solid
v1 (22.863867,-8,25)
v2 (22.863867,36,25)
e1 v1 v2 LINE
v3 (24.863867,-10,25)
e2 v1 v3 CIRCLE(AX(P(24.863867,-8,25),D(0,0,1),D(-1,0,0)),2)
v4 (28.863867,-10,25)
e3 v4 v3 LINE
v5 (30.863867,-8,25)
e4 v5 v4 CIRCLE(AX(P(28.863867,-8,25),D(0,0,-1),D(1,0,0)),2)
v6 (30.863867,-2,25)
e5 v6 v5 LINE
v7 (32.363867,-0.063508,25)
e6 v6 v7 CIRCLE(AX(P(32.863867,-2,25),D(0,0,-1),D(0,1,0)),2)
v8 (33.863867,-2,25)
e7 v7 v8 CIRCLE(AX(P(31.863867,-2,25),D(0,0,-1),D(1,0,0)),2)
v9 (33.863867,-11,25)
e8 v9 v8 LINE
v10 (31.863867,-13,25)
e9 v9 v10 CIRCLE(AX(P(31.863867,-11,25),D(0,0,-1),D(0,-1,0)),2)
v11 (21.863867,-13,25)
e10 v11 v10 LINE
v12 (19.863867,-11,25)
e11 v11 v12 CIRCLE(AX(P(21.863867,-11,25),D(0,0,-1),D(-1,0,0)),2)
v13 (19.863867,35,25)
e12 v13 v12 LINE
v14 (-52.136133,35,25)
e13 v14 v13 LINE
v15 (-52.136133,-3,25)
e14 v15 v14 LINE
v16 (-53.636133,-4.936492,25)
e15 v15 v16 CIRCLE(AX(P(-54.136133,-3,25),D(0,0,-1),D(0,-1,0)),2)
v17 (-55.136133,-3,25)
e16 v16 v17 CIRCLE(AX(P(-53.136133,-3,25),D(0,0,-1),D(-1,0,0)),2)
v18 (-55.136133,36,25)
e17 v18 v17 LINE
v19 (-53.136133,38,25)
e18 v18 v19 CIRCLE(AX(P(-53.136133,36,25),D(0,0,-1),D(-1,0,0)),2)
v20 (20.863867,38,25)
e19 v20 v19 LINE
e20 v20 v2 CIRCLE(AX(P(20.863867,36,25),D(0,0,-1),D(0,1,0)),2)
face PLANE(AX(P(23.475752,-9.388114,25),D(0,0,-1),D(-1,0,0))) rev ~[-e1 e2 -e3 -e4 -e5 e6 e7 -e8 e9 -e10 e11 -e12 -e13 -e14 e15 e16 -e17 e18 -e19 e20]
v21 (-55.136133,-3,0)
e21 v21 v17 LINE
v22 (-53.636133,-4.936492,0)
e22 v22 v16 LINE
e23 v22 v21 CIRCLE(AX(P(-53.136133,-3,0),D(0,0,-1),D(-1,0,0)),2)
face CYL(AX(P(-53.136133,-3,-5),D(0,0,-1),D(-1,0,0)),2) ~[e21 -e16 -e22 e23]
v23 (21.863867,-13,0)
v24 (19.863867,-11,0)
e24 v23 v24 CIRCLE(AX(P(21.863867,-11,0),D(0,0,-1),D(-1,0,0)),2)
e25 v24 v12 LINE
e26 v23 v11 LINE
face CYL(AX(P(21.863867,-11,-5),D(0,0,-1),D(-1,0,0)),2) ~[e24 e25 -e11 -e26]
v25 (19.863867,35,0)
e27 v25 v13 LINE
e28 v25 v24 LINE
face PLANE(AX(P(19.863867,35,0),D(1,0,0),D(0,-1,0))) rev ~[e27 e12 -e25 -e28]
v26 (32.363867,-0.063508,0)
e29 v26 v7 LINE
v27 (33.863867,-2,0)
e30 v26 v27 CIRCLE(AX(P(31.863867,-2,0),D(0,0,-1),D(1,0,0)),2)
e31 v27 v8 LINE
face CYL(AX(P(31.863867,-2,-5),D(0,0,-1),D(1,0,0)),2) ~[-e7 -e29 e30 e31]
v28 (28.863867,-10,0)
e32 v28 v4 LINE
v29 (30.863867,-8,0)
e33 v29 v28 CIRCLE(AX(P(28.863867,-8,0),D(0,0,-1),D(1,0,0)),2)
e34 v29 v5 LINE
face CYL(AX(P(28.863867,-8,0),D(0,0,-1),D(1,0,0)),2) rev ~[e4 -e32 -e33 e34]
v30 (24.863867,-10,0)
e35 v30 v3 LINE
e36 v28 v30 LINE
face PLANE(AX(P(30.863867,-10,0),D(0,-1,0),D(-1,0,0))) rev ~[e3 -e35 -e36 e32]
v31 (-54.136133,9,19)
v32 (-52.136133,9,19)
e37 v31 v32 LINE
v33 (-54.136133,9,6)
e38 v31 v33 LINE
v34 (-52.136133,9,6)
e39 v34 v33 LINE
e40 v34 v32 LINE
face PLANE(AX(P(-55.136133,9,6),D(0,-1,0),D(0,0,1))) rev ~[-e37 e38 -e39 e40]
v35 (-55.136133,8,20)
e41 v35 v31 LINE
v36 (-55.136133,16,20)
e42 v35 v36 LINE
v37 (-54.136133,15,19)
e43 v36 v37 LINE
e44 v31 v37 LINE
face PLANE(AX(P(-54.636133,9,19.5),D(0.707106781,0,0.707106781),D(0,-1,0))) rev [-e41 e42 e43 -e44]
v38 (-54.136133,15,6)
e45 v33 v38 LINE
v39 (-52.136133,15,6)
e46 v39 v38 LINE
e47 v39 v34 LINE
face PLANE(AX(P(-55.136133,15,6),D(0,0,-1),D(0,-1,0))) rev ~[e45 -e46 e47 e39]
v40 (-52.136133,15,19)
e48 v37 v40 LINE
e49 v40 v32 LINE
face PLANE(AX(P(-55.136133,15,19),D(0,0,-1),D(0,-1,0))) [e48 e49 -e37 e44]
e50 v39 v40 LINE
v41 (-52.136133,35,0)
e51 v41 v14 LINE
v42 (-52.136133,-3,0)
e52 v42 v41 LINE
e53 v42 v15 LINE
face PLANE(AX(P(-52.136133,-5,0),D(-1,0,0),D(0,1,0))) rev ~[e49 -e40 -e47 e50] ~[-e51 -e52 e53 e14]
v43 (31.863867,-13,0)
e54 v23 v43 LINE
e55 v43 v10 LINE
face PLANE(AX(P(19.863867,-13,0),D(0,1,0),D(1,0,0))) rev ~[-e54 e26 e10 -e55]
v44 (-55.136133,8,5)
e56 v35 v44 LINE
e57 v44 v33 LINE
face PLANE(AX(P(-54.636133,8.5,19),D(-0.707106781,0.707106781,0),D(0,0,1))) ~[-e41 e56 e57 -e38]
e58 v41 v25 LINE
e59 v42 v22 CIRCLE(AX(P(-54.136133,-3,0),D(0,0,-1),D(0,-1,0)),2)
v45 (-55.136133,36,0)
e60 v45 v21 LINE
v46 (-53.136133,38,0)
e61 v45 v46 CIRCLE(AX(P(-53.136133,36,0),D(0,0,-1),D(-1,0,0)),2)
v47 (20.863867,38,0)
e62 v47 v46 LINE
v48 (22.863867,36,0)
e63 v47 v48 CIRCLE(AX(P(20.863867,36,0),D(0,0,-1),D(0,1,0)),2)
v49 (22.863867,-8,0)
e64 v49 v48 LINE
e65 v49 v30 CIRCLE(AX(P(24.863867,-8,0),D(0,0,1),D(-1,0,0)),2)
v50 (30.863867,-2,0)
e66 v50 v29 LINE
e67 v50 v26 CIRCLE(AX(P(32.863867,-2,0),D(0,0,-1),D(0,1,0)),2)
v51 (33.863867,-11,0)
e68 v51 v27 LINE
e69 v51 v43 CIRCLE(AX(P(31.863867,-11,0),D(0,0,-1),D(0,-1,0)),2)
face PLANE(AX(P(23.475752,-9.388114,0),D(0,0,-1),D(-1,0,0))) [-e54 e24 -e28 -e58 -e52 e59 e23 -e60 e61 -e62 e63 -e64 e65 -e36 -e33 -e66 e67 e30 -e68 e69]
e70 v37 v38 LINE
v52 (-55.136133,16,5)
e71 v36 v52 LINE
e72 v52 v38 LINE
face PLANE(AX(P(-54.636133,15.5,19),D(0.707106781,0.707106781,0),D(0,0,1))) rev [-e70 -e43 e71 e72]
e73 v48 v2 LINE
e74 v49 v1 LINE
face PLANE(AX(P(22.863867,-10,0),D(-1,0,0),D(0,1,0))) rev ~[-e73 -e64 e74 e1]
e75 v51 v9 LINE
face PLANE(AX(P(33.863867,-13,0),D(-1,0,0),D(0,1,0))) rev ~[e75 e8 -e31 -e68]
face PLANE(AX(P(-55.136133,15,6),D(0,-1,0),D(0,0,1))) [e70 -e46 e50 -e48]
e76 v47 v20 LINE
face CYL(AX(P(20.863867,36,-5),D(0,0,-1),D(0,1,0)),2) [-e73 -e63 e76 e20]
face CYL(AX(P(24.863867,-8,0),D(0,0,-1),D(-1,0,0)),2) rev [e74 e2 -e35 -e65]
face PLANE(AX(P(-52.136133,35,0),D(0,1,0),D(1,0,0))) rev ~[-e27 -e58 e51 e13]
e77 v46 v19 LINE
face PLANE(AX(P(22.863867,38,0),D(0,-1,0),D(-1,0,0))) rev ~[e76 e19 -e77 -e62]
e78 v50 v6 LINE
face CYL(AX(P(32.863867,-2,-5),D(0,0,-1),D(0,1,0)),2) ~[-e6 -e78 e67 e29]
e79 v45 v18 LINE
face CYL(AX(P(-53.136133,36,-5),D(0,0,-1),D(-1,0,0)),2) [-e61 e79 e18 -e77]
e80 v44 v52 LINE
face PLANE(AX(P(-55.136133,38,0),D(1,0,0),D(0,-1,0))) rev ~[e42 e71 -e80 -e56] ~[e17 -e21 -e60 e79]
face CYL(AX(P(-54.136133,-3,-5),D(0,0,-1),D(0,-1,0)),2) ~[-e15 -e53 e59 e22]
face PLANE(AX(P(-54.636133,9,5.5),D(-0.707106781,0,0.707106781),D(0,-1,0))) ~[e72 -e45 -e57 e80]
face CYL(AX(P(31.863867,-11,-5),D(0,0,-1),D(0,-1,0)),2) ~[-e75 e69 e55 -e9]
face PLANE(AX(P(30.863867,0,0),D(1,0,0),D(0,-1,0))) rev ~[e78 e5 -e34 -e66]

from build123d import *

# Parameters (mm, degrees)
F1_DEPTH    = 25
F2_W        = 6
F2_H        = 13
F3_DEPTH    = 12.5
F4_SIZE2    = 1
F4_SIZE     = 1
F5_T1_DEPTH = 25
F5_T3_DEPTH = 35


# Not quite as in the source:
# - a fillet or chamfer that OpenCascade refuses, or shapes differently, is made with other operations: its cross-section is extruded or revolved along the edge and cut away or added


with BuildPart() as f1:
    # F0 (on Top) → F1 (new body)
    with BuildSketch(Plane.XY):
        Polygon((-55.1361331344, -5), (-52.1361331344, -5), (-52.1361331344, 35), (19.8638668656, 35), (19.8638668656, -10), (19.8638668656, -13), (30.8638668656, -13), (33.8638668656, -13), (33.8638668656, -10), (33.8638668656, 0), (30.8638668656, 0), (30.8638668656, -10), (22.8638668656, -10), (22.8638668656, 38), (-55.1361331344, 38), align=None)
    extrude(amount=F1_DEPTH)

    # F2 (on face) → F3 (cut, symmetric)
    with BuildSketch(Plane(origin=(-55.1361331344, 0, 0), x_dir=(0, -1, 0), z_dir=(-1, 0, 0))):
        with Locations((-12, 12.5)):
            Rectangle(F2_W, F2_H)
    extrude(amount=F3_DEPTH, both=True, mode=Mode.SUBTRACT)

    # F4
    f4_edges = [f1.edges().sort_by_distance(p)[0] for p in [
        (-55.136133, 12, 19),
        (-55.136133, 15, 12.5),
        (-55.136133, 9, 12.5),
        (-55.136133, 12, 6),
    ]]
    chamfer(f4_edges, length=F4_SIZE, length2=F4_SIZE2)

    # F5: fillet of radius 2 on 10 edges, made by hand

    # F5_s2 → F5_t1 (join)
    with BuildSketch(Plane.XY):
        with BuildLine():
            ThreePointArc((22.8638668656, -8), (23.4496533033, -9.4142135624), (24.8638668656, -10))
            Line((24.8638668656, -10), (22.8638668656, -10))
            Line((22.8638668656, -10), (22.8638668656, -8))
        make_face()
        with BuildLine():
            ThreePointArc((30.8638668656, -8), (30.278080428, -9.4142135624), (28.8638668656, -10))
            Line((28.8638668656, -10), (30.8638668656, -10))
            Line((30.8638668656, -10), (30.8638668656, -8))
        make_face()
    extrude(amount=F5_T1_DEPTH)

    # F5_s4 → F5_t3 (cut)
    with BuildSketch(Plane.XY.offset(-5)):
        with BuildLine():
            ThreePointArc((-55.1361331344, 36), (-54.5503466967, 37.4142135624), (-53.1361331344, 38))
            Line((-53.1361331344, 38), (-55.1361331344, 38))
            Line((-55.1361331344, 38), (-55.1361331344, 36))
        make_face()
        with BuildLine():
            ThreePointArc((20.8638668656, 38), (22.278080428, 37.4142135624), (22.8638668656, 36))
            Line((22.8638668656, 36), (22.8638668656, 38))
            Line((22.8638668656, 38), (20.8638668656, 38))
        make_face()
        with BuildLine():
            ThreePointArc((19.8638668656, -11), (20.4496533033, -12.4142135624), (21.8638668656, -13))
            Line((21.8638668656, -13), (19.8638668656, -13))
            Line((19.8638668656, -13), (19.8638668656, -11))
        make_face()
        with BuildLine():
            ThreePointArc((31.8638668656, -13), (33.278080428, -12.4142135624), (33.8638668656, -11))
            Line((33.8638668656, -11), (33.8638668656, -13))
            Line((33.8638668656, -13), (31.8638668656, -13))
        make_face()
        with BuildLine():
            ThreePointArc((33.8638668656, -2), (33.278080428, -0.5857864376), (31.8638668656, 0))
            Line((31.8638668656, 0), (33.8638668656, 0))
            Line((33.8638668656, 0), (33.8638668656, -2))
        make_face()
        with BuildLine():
            ThreePointArc((32.8638668656, 0), (31.4496533033, -0.5857864376), (30.8638668656, -2))
            Line((30.8638668656, -2), (30.8638668656, 0))
            Line((30.8638668656, 0), (32.8638668656, 0))
        make_face()
        with BuildLine():
            ThreePointArc((-55.1361331344, -3), (-54.5503466967, -4.4142135624), (-53.1361331344, -5))
            Line((-53.1361331344, -5), (-55.1361331344, -5))
            Line((-55.1361331344, -5), (-55.1361331344, -3))
        make_face()
        with BuildLine():
            ThreePointArc((-54.1361331344, -5), (-52.721919572, -4.4142135624), (-52.1361331344, -3))
            Line((-52.1361331344, -3), (-52.1361331344, -5))
            Line((-52.1361331344, -5), (-54.1361331344, -5))
        make_face()
    extrude(amount=F5_T3_DEPTH, mode=Mode.SUBTRACT)


solid = f1.part
